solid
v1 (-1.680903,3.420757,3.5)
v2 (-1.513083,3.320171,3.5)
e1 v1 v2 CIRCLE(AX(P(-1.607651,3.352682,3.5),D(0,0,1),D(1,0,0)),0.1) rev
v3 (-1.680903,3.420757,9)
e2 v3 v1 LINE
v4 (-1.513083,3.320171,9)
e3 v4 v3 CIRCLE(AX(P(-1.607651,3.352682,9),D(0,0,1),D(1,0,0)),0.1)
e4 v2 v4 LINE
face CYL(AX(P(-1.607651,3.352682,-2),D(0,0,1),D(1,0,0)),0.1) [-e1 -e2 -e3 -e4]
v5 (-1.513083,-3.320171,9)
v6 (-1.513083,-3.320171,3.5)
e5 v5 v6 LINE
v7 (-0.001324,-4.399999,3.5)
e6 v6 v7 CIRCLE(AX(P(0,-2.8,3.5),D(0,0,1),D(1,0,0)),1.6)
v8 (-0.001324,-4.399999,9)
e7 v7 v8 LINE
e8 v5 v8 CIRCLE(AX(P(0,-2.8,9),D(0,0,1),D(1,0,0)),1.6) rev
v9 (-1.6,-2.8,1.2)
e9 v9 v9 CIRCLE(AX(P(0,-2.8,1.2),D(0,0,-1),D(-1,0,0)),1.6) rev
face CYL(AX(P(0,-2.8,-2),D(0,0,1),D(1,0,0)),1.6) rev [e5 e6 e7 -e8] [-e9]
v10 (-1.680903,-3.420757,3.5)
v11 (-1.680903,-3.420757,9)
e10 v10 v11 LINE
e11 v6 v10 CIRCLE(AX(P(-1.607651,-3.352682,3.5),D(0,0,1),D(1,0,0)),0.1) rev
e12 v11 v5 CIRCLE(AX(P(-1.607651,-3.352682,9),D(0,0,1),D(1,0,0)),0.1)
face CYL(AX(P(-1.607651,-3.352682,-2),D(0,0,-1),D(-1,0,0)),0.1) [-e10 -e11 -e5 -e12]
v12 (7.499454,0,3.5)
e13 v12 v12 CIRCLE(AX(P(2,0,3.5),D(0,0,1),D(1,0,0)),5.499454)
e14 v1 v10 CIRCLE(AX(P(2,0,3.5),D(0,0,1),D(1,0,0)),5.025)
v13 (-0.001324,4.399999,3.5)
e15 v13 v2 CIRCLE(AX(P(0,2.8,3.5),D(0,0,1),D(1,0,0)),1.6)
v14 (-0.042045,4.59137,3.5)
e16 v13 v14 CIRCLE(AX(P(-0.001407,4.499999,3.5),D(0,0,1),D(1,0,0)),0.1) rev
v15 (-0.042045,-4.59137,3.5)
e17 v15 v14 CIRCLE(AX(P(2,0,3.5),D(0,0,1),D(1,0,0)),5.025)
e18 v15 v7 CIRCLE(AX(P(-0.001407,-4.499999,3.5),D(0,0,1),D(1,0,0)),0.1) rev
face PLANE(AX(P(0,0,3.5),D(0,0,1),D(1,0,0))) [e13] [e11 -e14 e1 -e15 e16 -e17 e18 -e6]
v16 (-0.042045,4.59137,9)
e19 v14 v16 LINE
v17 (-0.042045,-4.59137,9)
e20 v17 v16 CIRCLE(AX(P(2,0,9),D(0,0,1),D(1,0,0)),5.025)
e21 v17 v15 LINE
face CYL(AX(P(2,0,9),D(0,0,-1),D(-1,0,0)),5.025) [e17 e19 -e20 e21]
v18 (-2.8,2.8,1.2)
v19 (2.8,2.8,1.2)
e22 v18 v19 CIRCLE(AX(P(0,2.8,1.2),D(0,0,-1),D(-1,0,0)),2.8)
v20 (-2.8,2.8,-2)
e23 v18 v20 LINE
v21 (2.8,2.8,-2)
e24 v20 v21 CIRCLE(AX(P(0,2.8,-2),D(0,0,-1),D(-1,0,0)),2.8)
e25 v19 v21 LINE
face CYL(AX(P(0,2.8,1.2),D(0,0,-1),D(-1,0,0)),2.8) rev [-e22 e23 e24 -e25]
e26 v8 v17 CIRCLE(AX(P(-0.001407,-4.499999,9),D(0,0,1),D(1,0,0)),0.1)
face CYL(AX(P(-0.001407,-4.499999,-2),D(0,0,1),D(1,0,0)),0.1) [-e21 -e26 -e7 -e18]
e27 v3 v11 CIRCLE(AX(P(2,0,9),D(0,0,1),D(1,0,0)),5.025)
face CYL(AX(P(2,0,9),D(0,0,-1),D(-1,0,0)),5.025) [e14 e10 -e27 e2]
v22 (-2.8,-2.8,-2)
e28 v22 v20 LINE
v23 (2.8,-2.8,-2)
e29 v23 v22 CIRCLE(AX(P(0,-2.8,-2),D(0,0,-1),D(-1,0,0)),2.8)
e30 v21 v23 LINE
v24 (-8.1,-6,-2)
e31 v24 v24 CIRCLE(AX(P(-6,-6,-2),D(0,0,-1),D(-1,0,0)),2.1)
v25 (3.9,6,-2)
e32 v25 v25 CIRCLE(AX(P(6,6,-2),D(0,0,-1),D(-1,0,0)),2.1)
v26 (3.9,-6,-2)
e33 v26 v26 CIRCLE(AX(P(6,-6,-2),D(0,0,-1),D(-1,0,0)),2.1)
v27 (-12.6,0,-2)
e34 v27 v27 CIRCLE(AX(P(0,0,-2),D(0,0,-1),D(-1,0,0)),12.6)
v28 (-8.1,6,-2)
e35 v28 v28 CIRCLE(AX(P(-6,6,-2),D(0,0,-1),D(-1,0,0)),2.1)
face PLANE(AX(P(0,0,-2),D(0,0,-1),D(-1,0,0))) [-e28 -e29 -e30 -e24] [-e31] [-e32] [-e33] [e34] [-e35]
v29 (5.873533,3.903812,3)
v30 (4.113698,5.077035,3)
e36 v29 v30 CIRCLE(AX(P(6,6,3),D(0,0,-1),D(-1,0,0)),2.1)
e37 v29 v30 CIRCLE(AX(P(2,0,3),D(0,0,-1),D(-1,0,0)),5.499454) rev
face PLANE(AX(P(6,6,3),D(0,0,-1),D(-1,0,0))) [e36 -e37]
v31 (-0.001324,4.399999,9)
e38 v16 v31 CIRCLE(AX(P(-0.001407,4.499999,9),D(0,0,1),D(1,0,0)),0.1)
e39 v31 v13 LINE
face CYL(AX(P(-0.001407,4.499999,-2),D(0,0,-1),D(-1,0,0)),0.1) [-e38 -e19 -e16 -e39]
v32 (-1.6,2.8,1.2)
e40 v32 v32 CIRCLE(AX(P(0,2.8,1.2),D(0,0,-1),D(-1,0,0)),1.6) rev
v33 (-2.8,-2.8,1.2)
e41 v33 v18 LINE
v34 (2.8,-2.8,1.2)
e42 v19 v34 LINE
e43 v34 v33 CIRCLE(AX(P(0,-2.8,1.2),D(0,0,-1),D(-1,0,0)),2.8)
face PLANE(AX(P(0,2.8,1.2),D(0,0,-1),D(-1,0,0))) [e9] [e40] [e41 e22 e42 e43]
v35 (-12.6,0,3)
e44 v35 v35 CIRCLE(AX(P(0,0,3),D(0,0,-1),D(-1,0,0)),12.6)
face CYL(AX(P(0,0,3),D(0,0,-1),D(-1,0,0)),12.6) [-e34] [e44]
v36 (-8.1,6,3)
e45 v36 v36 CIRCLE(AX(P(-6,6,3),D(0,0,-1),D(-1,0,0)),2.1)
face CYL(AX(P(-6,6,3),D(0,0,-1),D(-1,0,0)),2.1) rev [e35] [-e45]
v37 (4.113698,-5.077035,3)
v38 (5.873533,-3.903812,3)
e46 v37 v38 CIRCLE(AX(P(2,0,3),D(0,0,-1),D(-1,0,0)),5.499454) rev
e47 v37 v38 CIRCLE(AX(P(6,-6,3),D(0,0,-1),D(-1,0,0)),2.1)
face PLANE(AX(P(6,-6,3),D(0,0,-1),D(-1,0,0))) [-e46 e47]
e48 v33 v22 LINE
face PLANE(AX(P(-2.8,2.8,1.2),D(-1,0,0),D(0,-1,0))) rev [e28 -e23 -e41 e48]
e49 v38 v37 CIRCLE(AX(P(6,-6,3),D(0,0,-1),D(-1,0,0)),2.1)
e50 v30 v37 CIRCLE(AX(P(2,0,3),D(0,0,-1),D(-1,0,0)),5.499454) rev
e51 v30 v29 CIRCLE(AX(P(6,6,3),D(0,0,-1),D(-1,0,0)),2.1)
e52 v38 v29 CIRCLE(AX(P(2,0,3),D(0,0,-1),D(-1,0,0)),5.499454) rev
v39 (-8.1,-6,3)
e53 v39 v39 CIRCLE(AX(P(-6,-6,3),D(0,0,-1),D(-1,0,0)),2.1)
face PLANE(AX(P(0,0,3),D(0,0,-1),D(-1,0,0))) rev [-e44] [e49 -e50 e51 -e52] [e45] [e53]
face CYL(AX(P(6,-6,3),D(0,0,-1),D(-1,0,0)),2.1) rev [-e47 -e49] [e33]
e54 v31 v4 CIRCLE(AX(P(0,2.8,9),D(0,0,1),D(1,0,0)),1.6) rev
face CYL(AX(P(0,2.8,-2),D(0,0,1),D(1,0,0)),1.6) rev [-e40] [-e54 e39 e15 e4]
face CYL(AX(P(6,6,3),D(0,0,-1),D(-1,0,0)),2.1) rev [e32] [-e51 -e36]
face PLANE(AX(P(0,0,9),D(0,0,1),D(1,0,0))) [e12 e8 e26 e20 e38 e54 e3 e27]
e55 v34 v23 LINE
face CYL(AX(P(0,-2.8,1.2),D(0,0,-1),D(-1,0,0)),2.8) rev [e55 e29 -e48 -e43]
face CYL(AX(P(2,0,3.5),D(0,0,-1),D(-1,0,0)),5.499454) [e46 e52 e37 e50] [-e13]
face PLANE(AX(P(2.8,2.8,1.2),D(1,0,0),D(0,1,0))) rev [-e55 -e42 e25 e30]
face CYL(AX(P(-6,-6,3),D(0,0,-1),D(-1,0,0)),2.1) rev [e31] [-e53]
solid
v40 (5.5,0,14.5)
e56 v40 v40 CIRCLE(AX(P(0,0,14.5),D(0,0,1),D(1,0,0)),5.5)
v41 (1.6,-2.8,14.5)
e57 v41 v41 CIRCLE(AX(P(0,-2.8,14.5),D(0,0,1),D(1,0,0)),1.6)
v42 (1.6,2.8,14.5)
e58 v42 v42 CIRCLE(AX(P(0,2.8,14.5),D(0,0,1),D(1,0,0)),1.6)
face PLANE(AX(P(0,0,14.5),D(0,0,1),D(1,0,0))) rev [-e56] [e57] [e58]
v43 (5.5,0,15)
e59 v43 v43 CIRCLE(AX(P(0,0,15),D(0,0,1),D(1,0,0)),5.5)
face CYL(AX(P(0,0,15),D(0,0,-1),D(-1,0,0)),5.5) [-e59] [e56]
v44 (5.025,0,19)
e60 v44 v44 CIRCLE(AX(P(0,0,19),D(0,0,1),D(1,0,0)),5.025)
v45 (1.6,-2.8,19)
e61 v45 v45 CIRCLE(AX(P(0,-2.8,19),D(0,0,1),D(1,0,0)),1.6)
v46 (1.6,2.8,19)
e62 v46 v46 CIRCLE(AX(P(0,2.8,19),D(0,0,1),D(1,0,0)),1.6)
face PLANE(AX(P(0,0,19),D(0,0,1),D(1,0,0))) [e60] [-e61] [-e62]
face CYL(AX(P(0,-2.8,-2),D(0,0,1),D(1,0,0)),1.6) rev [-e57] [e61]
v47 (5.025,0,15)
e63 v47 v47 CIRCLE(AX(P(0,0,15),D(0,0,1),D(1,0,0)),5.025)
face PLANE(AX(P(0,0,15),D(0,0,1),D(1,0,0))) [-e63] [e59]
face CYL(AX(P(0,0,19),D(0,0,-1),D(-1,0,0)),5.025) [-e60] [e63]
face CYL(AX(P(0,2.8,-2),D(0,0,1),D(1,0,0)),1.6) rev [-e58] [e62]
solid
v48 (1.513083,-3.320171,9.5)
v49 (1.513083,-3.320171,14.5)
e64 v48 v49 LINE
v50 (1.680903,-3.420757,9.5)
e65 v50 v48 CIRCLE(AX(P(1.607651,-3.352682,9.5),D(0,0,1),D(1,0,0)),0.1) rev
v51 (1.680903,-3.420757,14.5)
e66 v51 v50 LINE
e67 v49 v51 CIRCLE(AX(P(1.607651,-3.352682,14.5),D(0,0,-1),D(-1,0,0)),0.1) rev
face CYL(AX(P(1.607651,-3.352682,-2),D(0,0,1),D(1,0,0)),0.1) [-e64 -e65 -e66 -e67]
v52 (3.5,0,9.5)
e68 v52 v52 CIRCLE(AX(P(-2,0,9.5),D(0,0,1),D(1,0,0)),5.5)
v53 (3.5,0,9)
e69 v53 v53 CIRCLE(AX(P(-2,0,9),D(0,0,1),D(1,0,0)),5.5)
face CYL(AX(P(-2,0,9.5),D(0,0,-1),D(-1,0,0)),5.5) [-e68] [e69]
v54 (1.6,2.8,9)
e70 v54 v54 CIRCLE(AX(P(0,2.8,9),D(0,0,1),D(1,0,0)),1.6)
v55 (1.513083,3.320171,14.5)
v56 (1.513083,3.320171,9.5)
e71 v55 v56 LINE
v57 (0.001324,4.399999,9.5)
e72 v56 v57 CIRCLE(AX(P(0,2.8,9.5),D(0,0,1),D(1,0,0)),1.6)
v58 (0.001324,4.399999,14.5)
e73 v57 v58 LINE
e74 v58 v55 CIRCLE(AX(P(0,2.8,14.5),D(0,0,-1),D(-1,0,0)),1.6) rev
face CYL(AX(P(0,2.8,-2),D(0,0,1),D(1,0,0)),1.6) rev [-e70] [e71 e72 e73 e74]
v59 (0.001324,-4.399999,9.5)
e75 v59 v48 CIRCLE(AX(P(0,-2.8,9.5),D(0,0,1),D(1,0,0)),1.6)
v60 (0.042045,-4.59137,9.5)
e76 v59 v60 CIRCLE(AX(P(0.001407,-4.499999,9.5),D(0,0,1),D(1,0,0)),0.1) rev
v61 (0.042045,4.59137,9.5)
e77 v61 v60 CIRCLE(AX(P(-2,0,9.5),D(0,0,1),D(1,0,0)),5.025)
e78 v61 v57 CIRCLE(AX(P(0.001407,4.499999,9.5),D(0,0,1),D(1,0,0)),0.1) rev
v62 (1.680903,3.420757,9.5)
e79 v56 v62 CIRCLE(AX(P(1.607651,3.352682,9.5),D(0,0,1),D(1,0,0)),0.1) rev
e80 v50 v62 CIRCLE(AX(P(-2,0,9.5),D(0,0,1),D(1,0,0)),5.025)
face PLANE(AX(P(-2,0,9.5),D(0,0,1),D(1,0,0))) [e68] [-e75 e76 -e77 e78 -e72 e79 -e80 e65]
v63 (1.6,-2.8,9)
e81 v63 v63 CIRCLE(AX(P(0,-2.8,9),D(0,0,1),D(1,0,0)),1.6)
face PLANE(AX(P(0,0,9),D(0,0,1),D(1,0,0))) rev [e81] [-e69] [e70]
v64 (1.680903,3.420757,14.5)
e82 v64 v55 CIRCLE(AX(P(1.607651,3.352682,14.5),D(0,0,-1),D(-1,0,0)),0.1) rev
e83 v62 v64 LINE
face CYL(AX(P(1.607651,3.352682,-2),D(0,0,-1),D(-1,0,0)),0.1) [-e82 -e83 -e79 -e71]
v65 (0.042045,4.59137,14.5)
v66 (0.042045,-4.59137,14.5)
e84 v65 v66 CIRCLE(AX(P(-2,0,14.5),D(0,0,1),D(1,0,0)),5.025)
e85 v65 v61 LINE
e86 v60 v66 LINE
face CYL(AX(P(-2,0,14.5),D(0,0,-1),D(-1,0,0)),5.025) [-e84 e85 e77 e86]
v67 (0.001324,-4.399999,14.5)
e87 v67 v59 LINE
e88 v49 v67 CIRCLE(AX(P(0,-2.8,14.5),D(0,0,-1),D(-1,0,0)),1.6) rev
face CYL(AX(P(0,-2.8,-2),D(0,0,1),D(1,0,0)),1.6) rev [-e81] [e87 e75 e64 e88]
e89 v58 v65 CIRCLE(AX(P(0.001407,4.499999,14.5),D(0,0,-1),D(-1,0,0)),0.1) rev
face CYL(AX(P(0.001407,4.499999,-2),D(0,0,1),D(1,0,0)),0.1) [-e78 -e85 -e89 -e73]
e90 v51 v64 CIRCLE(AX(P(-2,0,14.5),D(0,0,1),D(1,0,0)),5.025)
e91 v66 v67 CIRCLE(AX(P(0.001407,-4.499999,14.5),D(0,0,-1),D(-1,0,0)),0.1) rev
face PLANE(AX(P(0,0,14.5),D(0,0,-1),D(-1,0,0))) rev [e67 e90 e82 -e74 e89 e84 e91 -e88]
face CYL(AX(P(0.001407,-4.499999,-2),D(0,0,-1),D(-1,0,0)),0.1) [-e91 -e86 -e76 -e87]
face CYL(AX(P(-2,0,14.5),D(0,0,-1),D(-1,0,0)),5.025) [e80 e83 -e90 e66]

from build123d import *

# Parameters (mm, degrees)
SKETCH1_R            = 12.6
BOSS_EXTRUDE1_DEPTH  = 5
SKETCH2_R            = 5.499454457575955
SKETCH2_R_2          = 5.0249999999999995
BOSS_EXTRUDE2_DEPTH  = 0.5
SKETCH2_3_R          = 5.0249999999999995
BOSS_EXTRUDE3_DEPTH  = 6
BOSS_EXTRUDE4_START  = 6
SKETCH3_R            = 5.5
SKETCH3_R_2          = 5.0249999999999995
BOSS_EXTRUDE4_DEPTH  = 0.5
BOSS_EXTRUDE5_START  = 6
SKETCH3_3_R          = 5.0249999999999995
BOSS_EXTRUDE5_DEPTH  = 5.5
BOSS_EXTRUDE6_START  = 11.5
SKETCH4_R            = 5.5
SKETCH4_R_2          = 5.0249999999999995
BOSS_EXTRUDE6_DEPTH  = 0.5
BOSS_EXTRUDE7_START  = 11.5
SKETCH4_7_R          = 5.0249999999999995
BOSS_EXTRUDE7_DEPTH  = 4.5
SKETCH5_R            = 1.6000000000000003
CUT_EXTRUDE1_DEPTH   = 28.541241802068402
SPLIT1_START         = 9
SPLIT1_OUTLINE_R     = 1.6
SPLIT1_DEPTH         = 10
SPLIT1_2_DEPTH       = 5.5
SPLIT1_3_OUTLINE_R   = 5.5
SPLIT1_3_DEPTH       = 0.5
SPLIT1_START_2       = 14.5
SPLIT1_4_OUTLINE_R   = 5.025
SPLIT1_4_OUTLINE_R_2 = 1.6
SPLIT1_4_DEPTH       = 4.5
SPLIT1_5_OUTLINE_R   = 5.5
SPLIT1_5_OUTLINE_R_2 = 5.025
SPLIT1_5_DEPTH       = 0.5
FILLET1_R            = 0.1
FILLET2_R            = 0.1
CUT_EXTRUDE2_DEPTH   = 3.2
SKETCH7_R            = 2.1000000000000005
SKETCH7_R_2          = 2.099999999999999
SKETCH7_R_3          = 2.1000000000000014
CUT_EXTRUDE3_DEPTH   = 5


# Read off the part's stored shape, not the designer's step: Split1
with BuildPart() as part:
    # Sketch1 → Boss-Extrude1 (new body)
    with BuildSketch(Plane(origin=(0, 0, -2), x_dir=(-1, 0, 0), z_dir=(0, 0, -1))):
        Circle(SKETCH1_R)
    extrude(amount=-BOSS_EXTRUDE1_DEPTH)

    # Sketch2 → Boss-Extrude2 (add)
    with BuildSketch(Plane.XY.offset(3)):
        with Locations(Location((2, 0, 0), (0, 0, 180))):
            Circle(SKETCH2_R)
        with Locations((2, 0)):
            Circle(SKETCH2_R_2, mode=Mode.SUBTRACT)
    extrude(amount=BOSS_EXTRUDE2_DEPTH)

    # Sketch2<3> → Boss-Extrude3 (add)
    with BuildSketch(Plane.XY.offset(3)):
        with Locations((2, 0)):
            Circle(SKETCH2_3_R)
    extrude(amount=BOSS_EXTRUDE3_DEPTH)



with BuildPart() as body_2:
    # Sketch3 → Boss-Extrude4 (new body)
    with BuildSketch(Plane.XY.offset(3).offset(BOSS_EXTRUDE4_START)):
        with Locations((-2, -2.4e-16)):
            Circle(SKETCH3_R)
        with Locations((-2, -2.4e-16)):
            Circle(SKETCH3_R_2, mode=Mode.SUBTRACT)
    extrude(amount=BOSS_EXTRUDE4_DEPTH)


with BuildPart() as part_1:
    add(part.part)

    add(body_2.part)  # Boss-Extrude5 merges body 2
    # Sketch3<3> → Boss-Extrude5 (add)
    with BuildSketch(Plane.XY.offset(3).offset(BOSS_EXTRUDE5_START)):
        with Locations((-2, -2.4e-16)):
            Circle(SKETCH3_3_R)
    extrude(amount=BOSS_EXTRUDE5_DEPTH)

    # Sketch4 → Boss-Extrude6 (add)
    with BuildSketch(Plane.XY.offset(3).offset(BOSS_EXTRUDE6_START)):
        with Locations(Location((0, 0, 0), (0, 0, 114.145956113))):
            Circle(SKETCH4_R)
        with Locations(Location((0, 0, 0), (0, 0, 101.478778724))):
            Circle(SKETCH4_R_2, mode=Mode.SUBTRACT)
    extrude(amount=BOSS_EXTRUDE6_DEPTH)

    # Sketch4<7> → Boss-Extrude7 (add)
    with BuildSketch(Plane.XY.offset(3).offset(BOSS_EXTRUDE7_START)):
        Circle(SKETCH4_7_R)
    extrude(amount=BOSS_EXTRUDE7_DEPTH)

    # Sketch5 → Cut-Extrude1 (cut, through all)
    with BuildSketch(Plane.XY.offset(19)):
        with Locations((2e-17, 2.8)):
            Circle(SKETCH5_R)
        with Locations((7.1e-16, -2.8)):
            Circle(SKETCH5_R)
    extrude(amount=-CUT_EXTRUDE1_DEPTH, mode=Mode.SUBTRACT)

    # Split1 outline → Split1 (cut)
    with BuildSketch(Plane.XY.offset(SPLIT1_START)):
        with BuildLine():
            ThreePointArc((-1, 5.408326913), (-7.5, 0), (-1, -5.408326913))
            ThreePointArc((-1, -5.408326913), (5.5, 0), (-1, 5.408326913))
        make_face()
        with Locations((0, 2.8)):
            Circle(SPLIT1_OUTLINE_R, mode=Mode.SUBTRACT)
        with Locations((0, -2.8)):
            Circle(SPLIT1_OUTLINE_R, mode=Mode.SUBTRACT)
    extrude(amount=SPLIT1_DEPTH, mode=Mode.SUBTRACT)

    # Fillet2
    fillet2_edges = [part_1.edges().sort_by_distance(p)[0] for p in [
        (-0.6950501563684846, -4.241147209736796, 6.25),
        (-1.1378256882261084, -3.9248789726956352, 6.25),
        (-1.1378256882260929, 3.924878972695648, 6.25),
        (-0.6950501563685023, 4.241147209736784, 6.25),
    ]]
    fillet(fillet2_edges, radius=FILLET2_R)

    # Sketch6 → Cut-Extrude2 (cut)
    with BuildSketch(Plane(origin=(0, 0, -2), x_dir=(-1, 0, 0), z_dir=(0, 0, -1))):
        with BuildLine():
            Line((2.8, 2.8), (2.799999999999999, -2.8))
            ThreePointArc((2.799999999999999, -2.8), (-1.22e-15, -5.6), (-2.8000000000000007, -2.8))
            Line((-2.8000000000000007, -2.8), (-2.8, 2.8))
            ThreePointArc((-2.8, 2.8), (1.5e-16, 5.6), (2.8, 2.8))
        make_face()
    extrude(amount=-CUT_EXTRUDE2_DEPTH, mode=Mode.SUBTRACT)

    # Sketch7 → Cut-Extrude3 (cut)
    with BuildSketch(Plane(origin=(0, 0, -2), x_dir=(-1, 0, 0), z_dir=(0, 0, -1))):
        with Locations((-6.000000000000002, 5.999999999999999)):
            Circle(SKETCH7_R)
        with Locations((5.999999999999998, 5.999999999999999)):
            Circle(SKETCH7_R)
        with Locations((5.999999999999998, -6.000000000000001)):
            Circle(SKETCH7_R_2)
        with Locations((-6.000000000000003, -6)):
            Circle(SKETCH7_R_3)
    extrude(amount=-CUT_EXTRUDE3_DEPTH, mode=Mode.SUBTRACT)


with BuildPart() as body_2_2:
    # Split1 2 outline → Split1 2 (new body)
    with BuildSketch(Plane.XY.offset(SPLIT1_START)):
        with BuildLine():
            ThreePointArc((1.137825688, -3.924878973), (3.025, 0), (1.137825688, 3.924878973))
            ThreePointArc((1.137825688, 3.924878973), (-0.92998111, 1.498026446), (0.695050156, 4.24114721))
            ThreePointArc((0.695050156, 4.24114721), (-7.025, 0), (0.695050156, -4.24114721))
            ThreePointArc((0.695050156, -4.24114721), (-0.92998111, -1.498026446), (1.137825688, -3.924878973))
        make_face()
    extrude(amount=SPLIT1_2_DEPTH)

    # Split1 3 outline → Split1 3 (add)
    with BuildSketch(Plane.XY.offset(SPLIT1_START)):
        with Locations((-2, 0)):
            Circle(SPLIT1_3_OUTLINE_R)
        with BuildLine():
            ThreePointArc((0.695050156, 4.24114721), (0.92998111, 4.101973554), (1.137825688, 3.924878973))
            ThreePointArc((1.137825688, 3.924878973), (3.025, 0), (1.137825688, -3.924878973))
            ThreePointArc((1.137825688, -3.924878973), (0.92998111, -4.101973554), (0.695050156, -4.24114721))
            ThreePointArc((0.695050156, -4.24114721), (-7.025, 0), (0.695050156, 4.24114721))
        make_face(mode=Mode.SUBTRACT)
    extrude(amount=SPLIT1_3_DEPTH)

    # Fillet1
    # the kernel refuses this fillet: 0.1 mm, written as the material it takes off along each edge
    with BuildSketch(Plane(origin=(1.1378256880000006, -3.924878973, 9.5), x_dir=(0.5272838464707954, 0.8496892050926401, 0), z_dir=(0, 0, 1))) as fillet1_piece_1:
        with BuildLine():
            CenterArc((0.7339208558356513, -0.09749554475196075), FILLET1_R, 102.8500510005881, 156.06997269077794)
            Line((0.7147029545095785, -0.19563153340353207), (0.7143185964830571, -0.19759425317656348))
            ThreePointArc((0.7143185964830571, -0.19759425317656348), (0.3532125240431902, -0.1129366525704308), (-0.00066881691387395, -0.00188485647615828))
            Line((-0.00066881691387395, -0.00188485647615828), (0.00044480051866812, 0.00194991089503923))
            ThreePointArc((0.00044480051866812, 0.00194991089503923), (0.35584041495112406, -0.03807128397050696), (0.7112360293835808, 0.00194991089503922))
            Line((0.7112360293835808, 0.00194991089503922), (0.7116808299022489, -4e-17))
        make_face()
    extrude(amount=5, mode=Mode.SUBTRACT)
    with BuildSketch(Plane(origin=(0.6950501559999995, -4.241147210000001, 9.5), x_dir=(-0.9747710361649122, -0.22320713934366773, 0), z_dir=(0, 0, 1))) as fillet1_piece_2:
        with BuildLine():
            CenterArc((0.7339208553218103, 0.09749554475551281), FILLET1_R, 101.07997632228573, 156.06997268627677)
            Line((0.714702953972355, 0.19563153340250483), (0.7143185959453658, 0.1975942531754444))
            ThreePointArc((0.7143185959453658, 0.1975942531754444), (0.35321252377659246, 0.11293665255128191), (-0.00066881691414123, 0.00188485647606383))
            Line((-0.00066881691414123, 0.00188485647606383), (0.00044480051835665, -0.00194991089511022))
            ThreePointArc((0.00044480051835665, -0.00194991089511022), (0.35584041470198946, 0.03807128391367618), (0.711236028885622, -0.00194991089511051))
            Line((0.711236028885622, -0.00194991089511051), (0.7116808294039787, 0))
        make_face()
    extrude(amount=5, mode=Mode.SUBTRACT)
    with BuildSketch(Plane(origin=(0.6950501560000002, 4.24114721, 9.5), x_dir=(-0.8812560463152725, 0.4726391655721877, 0), z_dir=(0, 0, 1))) as fillet1_piece_3:
        with BuildLine():
            CenterArc((0.7336208593975166, 0.09972781848774585), FILLET1_R, 118.15832442623193, 156.06997268627686)
            Line((0.6864298993019216, 0.18789251258496353), (0.6854860801000094, 0.1896558064669081))
            ThreePointArc((0.6854860801000094, 0.1896558064669081), (0.35326623794808576, 0.05722576797323723), (-8.578182782469e-05, 0.00199815952266453))
            Line((-8.578182782469e-05, 0.00199815952266453), (-0.00014746147927519, -0.00199455636975523))
            ThreePointArc((-0.00014746147927519, -0.00199455636975523), (0.37049696668064286, -0.01567712099081798), (0.7411413948405625, -0.00199455636975463))
            Line((0.7411413948405625, -0.00199455636975463), (0.7409939333612872, 0))
        make_face()
    extrude(amount=5, mode=Mode.SUBTRACT)
    with BuildSketch(Plane(origin=(1.1378256880000008, 3.924878973, 9.5), x_dir=(0.7329038743989365, -0.6803322062720741, 0), z_dir=(0, 0, 1))) as fillet1_piece_4:
        with BuildLine():
            CenterArc((0.7336208599111411, -0.09972781848739057), FILLET1_R, 85.77170288473079, 156.06997269077783)
            Line((0.6864298998182243, -0.1878925125860417), (0.6854860806163661, -0.18965580646801475))
            ThreePointArc((0.6854860806163661, -0.18965580646801475), (0.35326623821426095, -0.05722576791705115), (-8.578182712573e-05, -0.00199815952269459))
            Line((-8.578182712573e-05, -0.00199815952269459), (-0.00014746147937158, 0.00199455636974773))
            ThreePointArc((-0.00014746147937158, 0.00199455636974773), (0.3704969669398584, 0.01567712100932383), (0.7411413953590879, 0.00199455636974782))
            Line((0.7411413953590879, 0.00199455636974782), (0.7409939338797163, 3e-17))
        make_face()
    extrude(amount=5, mode=Mode.SUBTRACT)


with BuildPart() as body_3:
    # Split1 4 outline → Split1 4 (new body)
    with BuildSketch(Plane.XY.offset(SPLIT1_START_2)):
        Circle(SPLIT1_4_OUTLINE_R)
        with Locations((0, -2.8)):
            Circle(SPLIT1_4_OUTLINE_R_2, mode=Mode.SUBTRACT)
        with Locations((0, 2.8)):
            Circle(SPLIT1_4_OUTLINE_R_2, mode=Mode.SUBTRACT)
    extrude(amount=SPLIT1_4_DEPTH)

    # Split1 5 outline → Split1 5 (add)
    with BuildSketch(Plane.XY.offset(SPLIT1_START_2)):
        Circle(SPLIT1_5_OUTLINE_R)
        Circle(SPLIT1_5_OUTLINE_R_2, mode=Mode.SUBTRACT)
    extrude(amount=SPLIT1_5_DEPTH)


solid = Compound([part_1.part, body_2_2.part, body_3.part])
